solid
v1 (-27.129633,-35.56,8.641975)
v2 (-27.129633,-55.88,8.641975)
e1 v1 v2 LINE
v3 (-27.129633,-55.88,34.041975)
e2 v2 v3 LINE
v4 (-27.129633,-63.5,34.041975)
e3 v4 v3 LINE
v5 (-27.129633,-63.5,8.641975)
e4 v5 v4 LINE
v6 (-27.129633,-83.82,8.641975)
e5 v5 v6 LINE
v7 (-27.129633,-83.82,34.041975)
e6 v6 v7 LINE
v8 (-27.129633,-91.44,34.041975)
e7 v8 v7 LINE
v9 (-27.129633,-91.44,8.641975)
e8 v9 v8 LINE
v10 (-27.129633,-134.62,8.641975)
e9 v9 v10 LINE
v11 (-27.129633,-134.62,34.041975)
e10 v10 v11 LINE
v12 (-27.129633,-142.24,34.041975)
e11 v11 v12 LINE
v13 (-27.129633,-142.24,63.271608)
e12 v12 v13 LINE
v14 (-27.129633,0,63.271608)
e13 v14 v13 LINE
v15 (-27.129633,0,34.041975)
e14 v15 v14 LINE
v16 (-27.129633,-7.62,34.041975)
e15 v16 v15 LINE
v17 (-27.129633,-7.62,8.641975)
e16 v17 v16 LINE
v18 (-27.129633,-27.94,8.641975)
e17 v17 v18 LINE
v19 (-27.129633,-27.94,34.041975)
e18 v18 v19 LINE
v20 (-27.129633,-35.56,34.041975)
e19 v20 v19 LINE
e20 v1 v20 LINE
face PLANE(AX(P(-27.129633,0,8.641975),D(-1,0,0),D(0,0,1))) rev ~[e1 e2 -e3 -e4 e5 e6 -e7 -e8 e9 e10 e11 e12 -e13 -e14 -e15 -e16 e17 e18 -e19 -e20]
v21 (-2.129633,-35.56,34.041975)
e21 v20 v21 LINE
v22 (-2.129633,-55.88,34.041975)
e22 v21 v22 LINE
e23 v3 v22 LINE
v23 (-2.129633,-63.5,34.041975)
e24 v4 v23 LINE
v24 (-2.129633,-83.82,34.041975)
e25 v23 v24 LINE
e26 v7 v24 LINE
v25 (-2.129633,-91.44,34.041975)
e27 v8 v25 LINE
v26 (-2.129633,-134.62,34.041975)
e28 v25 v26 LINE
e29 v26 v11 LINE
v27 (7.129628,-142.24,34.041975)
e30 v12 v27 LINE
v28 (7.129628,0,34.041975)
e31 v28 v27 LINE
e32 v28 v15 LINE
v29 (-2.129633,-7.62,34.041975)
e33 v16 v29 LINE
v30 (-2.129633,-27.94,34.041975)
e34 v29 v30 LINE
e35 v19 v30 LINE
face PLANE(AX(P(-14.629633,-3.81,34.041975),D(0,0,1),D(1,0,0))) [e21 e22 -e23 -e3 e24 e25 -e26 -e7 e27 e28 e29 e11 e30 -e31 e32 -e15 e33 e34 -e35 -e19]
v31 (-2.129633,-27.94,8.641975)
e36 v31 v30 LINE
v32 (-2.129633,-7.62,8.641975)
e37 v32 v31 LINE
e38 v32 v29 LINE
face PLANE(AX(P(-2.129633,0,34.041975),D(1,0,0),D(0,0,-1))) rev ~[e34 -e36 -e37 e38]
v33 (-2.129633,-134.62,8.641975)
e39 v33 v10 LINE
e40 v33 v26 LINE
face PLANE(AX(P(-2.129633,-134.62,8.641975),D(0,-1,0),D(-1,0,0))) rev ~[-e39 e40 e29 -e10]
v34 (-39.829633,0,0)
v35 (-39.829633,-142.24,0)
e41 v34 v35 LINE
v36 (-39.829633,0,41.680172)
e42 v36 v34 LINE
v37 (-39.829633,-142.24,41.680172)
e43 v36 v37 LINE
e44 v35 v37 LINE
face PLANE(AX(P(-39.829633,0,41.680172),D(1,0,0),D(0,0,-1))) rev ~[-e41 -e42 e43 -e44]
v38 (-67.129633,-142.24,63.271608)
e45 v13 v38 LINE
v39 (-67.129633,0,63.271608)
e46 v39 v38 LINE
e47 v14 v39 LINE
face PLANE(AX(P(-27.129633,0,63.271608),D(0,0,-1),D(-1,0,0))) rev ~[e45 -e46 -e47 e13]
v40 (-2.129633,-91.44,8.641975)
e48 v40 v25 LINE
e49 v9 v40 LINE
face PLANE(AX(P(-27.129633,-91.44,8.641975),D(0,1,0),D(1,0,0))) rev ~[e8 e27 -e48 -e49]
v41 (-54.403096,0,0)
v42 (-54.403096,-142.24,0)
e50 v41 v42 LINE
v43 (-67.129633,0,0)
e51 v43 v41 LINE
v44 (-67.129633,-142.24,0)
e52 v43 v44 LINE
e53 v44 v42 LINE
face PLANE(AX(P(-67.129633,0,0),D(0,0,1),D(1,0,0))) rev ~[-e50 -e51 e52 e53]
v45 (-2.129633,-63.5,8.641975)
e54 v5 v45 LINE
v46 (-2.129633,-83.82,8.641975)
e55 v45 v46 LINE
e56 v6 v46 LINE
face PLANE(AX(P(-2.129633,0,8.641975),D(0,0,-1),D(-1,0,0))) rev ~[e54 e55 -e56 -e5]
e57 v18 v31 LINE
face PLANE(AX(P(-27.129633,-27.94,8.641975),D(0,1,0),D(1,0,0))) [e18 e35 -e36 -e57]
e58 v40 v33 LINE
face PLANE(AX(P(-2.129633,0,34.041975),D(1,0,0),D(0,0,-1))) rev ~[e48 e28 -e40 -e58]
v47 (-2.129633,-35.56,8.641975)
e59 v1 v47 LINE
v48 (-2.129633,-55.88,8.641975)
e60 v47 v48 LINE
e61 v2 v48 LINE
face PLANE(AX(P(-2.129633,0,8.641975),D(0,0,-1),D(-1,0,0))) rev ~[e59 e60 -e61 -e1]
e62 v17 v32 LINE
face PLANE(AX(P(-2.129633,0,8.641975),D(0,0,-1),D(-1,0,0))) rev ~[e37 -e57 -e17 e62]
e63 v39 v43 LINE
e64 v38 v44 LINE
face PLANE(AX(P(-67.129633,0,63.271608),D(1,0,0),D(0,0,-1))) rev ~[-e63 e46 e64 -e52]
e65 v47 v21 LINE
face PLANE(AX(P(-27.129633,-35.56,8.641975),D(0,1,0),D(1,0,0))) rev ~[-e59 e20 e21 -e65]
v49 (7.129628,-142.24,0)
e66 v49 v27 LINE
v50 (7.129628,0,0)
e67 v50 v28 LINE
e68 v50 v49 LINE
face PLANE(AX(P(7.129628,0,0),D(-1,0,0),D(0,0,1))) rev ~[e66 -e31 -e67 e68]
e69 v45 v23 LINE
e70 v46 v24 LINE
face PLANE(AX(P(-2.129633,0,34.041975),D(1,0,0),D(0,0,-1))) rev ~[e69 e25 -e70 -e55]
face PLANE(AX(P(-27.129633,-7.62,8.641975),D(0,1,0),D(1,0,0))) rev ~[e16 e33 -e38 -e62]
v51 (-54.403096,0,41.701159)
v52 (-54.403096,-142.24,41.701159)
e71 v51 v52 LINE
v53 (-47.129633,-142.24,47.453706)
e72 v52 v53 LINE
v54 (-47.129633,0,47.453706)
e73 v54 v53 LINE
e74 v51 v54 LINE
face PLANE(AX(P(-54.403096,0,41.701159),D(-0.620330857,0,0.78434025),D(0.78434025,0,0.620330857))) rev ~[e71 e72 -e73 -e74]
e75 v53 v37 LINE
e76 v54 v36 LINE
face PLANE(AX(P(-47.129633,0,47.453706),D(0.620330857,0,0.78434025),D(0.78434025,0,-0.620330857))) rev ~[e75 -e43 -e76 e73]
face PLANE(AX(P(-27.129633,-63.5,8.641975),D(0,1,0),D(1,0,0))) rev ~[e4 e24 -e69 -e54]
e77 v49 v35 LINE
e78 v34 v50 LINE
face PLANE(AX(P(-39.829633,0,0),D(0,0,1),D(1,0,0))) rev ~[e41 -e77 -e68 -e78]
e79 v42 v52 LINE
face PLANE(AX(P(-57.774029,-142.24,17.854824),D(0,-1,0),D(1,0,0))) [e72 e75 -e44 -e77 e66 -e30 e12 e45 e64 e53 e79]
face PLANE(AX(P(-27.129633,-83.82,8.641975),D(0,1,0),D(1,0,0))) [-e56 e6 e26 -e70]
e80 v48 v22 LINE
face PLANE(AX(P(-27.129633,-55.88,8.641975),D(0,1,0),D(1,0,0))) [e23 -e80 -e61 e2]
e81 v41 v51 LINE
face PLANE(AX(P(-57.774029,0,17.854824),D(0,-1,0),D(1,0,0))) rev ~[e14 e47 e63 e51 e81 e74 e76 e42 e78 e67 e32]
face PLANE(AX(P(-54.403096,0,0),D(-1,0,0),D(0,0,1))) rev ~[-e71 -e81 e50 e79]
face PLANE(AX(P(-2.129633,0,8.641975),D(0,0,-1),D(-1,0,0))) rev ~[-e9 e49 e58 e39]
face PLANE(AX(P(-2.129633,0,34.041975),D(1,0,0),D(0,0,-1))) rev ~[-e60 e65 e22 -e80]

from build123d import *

# Parameters (mm, degrees)
F0_W     = 0.026536879
F0_H     = 8.3333357554
F0_W_2   = 14.573463121
F1_DEPTH = 142.24
F2_W     = 27.8897660319
F2_H     = 8.4373559803
F3_DEPTH = 2.54
F4_W     = 25
F4_H     = 7.62
F5_DEPTH = 25.4


with BuildPart() as f1:
    # F0 (on Front) → F1 (new body)
    with BuildSketch(Plane.XZ):
        Polygon((-54.4296333165, 41.6801715141), (-54.4296333165, 16.0493828058), (-67.1296333165, 16.0493828058), (-67.1296333165, 0), (-54.4030964375, 0), (-54.4030964375, 41.7011594015), align=None)
        Polygon((-67.1296333165, 16.0493828058), (-54.4296333165, 16.0493828058), (-54.4296333165, 41.6801715141), (-67.1296333165, 31.6358038057), align=None)
        Polygon((-67.1296333165, 31.6358038057), (-54.4296333165, 41.6801715141), (-54.4296333165, 53.2272399031), (-56.5930453334, 54.9382718561), (-67.1296333165, 54.9382718561), align=None)
        Polygon((-54.4296333165, 53.2272399031), (-54.4296333165, 41.6801715141), (-54.4030964375, 41.7011594015), (-54.4030964375, 53.2062520157), align=None)
        Polygon((-56.5930453334, 54.9382718561), (-54.4296333165, 53.2272399031), (-54.4296333165, 54.9382718561), align=None)
        Polygon((-54.4296333165, 54.9382718561), (-54.4296333165, 53.2272399031), (-54.4030964375, 53.2062520157), (-54.4030964375, 54.9382718561), align=None)
        Polygon((-54.4030964375, 53.2062520157), (-54.4030964375, 41.7011594015), (-47.1296333165, 47.4537057086), align=None)
        Polygon((-67.1296333165, 63.2716076115), (-67.1296333165, 54.9382718561), (-56.5930453334, 54.9382718561), align=None)
        Polygon((-56.5930453334, 54.9382718561), (-54.4296333165, 54.9382718561), (-54.4296333165, 63.2716076115), (-67.1296333165, 63.2716076115), align=None)
        with Locations((-54.416364877, 59.1049397338)):
            Rectangle(F0_W, F0_H)
        Polygon((-54.4030964375, 54.9382718561), (-54.4030964375, 53.2062520157), (-47.1296333165, 47.4537057086), (-39.8296333165, 53.2272399031), (-39.8296333165, 54.9382718561), align=None)
        Polygon((-39.8296333165, 53.2272399031), (-47.1296333165, 47.4537057086), (-39.8296333165, 41.6801715141), align=None)
        with Locations((-47.116364877, 59.1049397338)):
            Rectangle(F0_W_2, F0_H)
        Polygon((-37.6662212996, 54.9382718561), (-39.8296333165, 53.2272399031), (-39.8296333165, 41.6801715141), (-27.1296333165, 31.6358038057), (-27.1296333165, 54.9382718561), align=None)
        Polygon((-39.8296333165, 54.9382718561), (-39.8296333165, 53.2272399031), (-37.6662212996, 54.9382718561), align=None)
        Polygon((-27.1296333165, 31.6358038057), (-39.8296333165, 41.6801715141), (-39.8296333165, 8.6419750216), (-39.8296333165, 0), (-27.1296333165, 0), (-27.1296333165, 8.6419750216), align=None)
        Polygon((-39.8296333165, 63.2716076115), (-39.8296333165, 54.9382718561), (-37.6662212996, 54.9382718561), (-27.1296333165, 63.2716076115), align=None)
        Polygon((-27.1296333165, 63.2716076115), (-37.6662212996, 54.9382718561), (-27.1296333165, 54.9382718561), align=None)
        Polygon((-2.1296333165, 8.6419750216), (-27.1296333165, 8.6419750216), (-27.1296333165, 0), (-2.1296333165, 0), (-2.1296333165, 1.0219750216), align=None)
        Polygon((-2.1296333165, 34.0419750216), (-2.1296333165, 8.6419750216), (-2.1296333165, 1.0219750216), (-2.1296333165, 0), (7.1296278669, 0), (7.1296278669, 1.0219750216), (7.1296278669, 34.0419750216), align=None)
    extrude(amount=F1_DEPTH)

    # F2 (on face) → F3 (join)
    with BuildSketch(Plane.XZ.offset(142.24)):
        with Locations((-25.8847503005, 4.2186779901)):
            Rectangle(F2_W, F2_H)
    extrude(amount=-F3_DEPTH)

    # F4 (on face) → F5 (join)
    with BuildSketch(Plane.XY.offset(8.6419750216)):
        with Locations((-14.6296333165, -87.63)):
            Rectangle(F4_W, F4_H)
        with Locations((-14.6296333165, -59.69)):
            Rectangle(F4_W, F4_H)
        with Locations((-14.6296333165, -31.75)):
            Rectangle(F4_W, F4_H)
        with Locations((-14.6296333165, -3.81)):
            Rectangle(F4_W, F4_H)
        Polygon((-2.1296333165, -139.7), (-2.1296333165, -134.62), (-27.1296333165, -134.62), (-27.1296333165, -142.24), (-2.1296333165, -142.24), align=None)
    extrude(amount=F5_DEPTH)


solid = f1.part
